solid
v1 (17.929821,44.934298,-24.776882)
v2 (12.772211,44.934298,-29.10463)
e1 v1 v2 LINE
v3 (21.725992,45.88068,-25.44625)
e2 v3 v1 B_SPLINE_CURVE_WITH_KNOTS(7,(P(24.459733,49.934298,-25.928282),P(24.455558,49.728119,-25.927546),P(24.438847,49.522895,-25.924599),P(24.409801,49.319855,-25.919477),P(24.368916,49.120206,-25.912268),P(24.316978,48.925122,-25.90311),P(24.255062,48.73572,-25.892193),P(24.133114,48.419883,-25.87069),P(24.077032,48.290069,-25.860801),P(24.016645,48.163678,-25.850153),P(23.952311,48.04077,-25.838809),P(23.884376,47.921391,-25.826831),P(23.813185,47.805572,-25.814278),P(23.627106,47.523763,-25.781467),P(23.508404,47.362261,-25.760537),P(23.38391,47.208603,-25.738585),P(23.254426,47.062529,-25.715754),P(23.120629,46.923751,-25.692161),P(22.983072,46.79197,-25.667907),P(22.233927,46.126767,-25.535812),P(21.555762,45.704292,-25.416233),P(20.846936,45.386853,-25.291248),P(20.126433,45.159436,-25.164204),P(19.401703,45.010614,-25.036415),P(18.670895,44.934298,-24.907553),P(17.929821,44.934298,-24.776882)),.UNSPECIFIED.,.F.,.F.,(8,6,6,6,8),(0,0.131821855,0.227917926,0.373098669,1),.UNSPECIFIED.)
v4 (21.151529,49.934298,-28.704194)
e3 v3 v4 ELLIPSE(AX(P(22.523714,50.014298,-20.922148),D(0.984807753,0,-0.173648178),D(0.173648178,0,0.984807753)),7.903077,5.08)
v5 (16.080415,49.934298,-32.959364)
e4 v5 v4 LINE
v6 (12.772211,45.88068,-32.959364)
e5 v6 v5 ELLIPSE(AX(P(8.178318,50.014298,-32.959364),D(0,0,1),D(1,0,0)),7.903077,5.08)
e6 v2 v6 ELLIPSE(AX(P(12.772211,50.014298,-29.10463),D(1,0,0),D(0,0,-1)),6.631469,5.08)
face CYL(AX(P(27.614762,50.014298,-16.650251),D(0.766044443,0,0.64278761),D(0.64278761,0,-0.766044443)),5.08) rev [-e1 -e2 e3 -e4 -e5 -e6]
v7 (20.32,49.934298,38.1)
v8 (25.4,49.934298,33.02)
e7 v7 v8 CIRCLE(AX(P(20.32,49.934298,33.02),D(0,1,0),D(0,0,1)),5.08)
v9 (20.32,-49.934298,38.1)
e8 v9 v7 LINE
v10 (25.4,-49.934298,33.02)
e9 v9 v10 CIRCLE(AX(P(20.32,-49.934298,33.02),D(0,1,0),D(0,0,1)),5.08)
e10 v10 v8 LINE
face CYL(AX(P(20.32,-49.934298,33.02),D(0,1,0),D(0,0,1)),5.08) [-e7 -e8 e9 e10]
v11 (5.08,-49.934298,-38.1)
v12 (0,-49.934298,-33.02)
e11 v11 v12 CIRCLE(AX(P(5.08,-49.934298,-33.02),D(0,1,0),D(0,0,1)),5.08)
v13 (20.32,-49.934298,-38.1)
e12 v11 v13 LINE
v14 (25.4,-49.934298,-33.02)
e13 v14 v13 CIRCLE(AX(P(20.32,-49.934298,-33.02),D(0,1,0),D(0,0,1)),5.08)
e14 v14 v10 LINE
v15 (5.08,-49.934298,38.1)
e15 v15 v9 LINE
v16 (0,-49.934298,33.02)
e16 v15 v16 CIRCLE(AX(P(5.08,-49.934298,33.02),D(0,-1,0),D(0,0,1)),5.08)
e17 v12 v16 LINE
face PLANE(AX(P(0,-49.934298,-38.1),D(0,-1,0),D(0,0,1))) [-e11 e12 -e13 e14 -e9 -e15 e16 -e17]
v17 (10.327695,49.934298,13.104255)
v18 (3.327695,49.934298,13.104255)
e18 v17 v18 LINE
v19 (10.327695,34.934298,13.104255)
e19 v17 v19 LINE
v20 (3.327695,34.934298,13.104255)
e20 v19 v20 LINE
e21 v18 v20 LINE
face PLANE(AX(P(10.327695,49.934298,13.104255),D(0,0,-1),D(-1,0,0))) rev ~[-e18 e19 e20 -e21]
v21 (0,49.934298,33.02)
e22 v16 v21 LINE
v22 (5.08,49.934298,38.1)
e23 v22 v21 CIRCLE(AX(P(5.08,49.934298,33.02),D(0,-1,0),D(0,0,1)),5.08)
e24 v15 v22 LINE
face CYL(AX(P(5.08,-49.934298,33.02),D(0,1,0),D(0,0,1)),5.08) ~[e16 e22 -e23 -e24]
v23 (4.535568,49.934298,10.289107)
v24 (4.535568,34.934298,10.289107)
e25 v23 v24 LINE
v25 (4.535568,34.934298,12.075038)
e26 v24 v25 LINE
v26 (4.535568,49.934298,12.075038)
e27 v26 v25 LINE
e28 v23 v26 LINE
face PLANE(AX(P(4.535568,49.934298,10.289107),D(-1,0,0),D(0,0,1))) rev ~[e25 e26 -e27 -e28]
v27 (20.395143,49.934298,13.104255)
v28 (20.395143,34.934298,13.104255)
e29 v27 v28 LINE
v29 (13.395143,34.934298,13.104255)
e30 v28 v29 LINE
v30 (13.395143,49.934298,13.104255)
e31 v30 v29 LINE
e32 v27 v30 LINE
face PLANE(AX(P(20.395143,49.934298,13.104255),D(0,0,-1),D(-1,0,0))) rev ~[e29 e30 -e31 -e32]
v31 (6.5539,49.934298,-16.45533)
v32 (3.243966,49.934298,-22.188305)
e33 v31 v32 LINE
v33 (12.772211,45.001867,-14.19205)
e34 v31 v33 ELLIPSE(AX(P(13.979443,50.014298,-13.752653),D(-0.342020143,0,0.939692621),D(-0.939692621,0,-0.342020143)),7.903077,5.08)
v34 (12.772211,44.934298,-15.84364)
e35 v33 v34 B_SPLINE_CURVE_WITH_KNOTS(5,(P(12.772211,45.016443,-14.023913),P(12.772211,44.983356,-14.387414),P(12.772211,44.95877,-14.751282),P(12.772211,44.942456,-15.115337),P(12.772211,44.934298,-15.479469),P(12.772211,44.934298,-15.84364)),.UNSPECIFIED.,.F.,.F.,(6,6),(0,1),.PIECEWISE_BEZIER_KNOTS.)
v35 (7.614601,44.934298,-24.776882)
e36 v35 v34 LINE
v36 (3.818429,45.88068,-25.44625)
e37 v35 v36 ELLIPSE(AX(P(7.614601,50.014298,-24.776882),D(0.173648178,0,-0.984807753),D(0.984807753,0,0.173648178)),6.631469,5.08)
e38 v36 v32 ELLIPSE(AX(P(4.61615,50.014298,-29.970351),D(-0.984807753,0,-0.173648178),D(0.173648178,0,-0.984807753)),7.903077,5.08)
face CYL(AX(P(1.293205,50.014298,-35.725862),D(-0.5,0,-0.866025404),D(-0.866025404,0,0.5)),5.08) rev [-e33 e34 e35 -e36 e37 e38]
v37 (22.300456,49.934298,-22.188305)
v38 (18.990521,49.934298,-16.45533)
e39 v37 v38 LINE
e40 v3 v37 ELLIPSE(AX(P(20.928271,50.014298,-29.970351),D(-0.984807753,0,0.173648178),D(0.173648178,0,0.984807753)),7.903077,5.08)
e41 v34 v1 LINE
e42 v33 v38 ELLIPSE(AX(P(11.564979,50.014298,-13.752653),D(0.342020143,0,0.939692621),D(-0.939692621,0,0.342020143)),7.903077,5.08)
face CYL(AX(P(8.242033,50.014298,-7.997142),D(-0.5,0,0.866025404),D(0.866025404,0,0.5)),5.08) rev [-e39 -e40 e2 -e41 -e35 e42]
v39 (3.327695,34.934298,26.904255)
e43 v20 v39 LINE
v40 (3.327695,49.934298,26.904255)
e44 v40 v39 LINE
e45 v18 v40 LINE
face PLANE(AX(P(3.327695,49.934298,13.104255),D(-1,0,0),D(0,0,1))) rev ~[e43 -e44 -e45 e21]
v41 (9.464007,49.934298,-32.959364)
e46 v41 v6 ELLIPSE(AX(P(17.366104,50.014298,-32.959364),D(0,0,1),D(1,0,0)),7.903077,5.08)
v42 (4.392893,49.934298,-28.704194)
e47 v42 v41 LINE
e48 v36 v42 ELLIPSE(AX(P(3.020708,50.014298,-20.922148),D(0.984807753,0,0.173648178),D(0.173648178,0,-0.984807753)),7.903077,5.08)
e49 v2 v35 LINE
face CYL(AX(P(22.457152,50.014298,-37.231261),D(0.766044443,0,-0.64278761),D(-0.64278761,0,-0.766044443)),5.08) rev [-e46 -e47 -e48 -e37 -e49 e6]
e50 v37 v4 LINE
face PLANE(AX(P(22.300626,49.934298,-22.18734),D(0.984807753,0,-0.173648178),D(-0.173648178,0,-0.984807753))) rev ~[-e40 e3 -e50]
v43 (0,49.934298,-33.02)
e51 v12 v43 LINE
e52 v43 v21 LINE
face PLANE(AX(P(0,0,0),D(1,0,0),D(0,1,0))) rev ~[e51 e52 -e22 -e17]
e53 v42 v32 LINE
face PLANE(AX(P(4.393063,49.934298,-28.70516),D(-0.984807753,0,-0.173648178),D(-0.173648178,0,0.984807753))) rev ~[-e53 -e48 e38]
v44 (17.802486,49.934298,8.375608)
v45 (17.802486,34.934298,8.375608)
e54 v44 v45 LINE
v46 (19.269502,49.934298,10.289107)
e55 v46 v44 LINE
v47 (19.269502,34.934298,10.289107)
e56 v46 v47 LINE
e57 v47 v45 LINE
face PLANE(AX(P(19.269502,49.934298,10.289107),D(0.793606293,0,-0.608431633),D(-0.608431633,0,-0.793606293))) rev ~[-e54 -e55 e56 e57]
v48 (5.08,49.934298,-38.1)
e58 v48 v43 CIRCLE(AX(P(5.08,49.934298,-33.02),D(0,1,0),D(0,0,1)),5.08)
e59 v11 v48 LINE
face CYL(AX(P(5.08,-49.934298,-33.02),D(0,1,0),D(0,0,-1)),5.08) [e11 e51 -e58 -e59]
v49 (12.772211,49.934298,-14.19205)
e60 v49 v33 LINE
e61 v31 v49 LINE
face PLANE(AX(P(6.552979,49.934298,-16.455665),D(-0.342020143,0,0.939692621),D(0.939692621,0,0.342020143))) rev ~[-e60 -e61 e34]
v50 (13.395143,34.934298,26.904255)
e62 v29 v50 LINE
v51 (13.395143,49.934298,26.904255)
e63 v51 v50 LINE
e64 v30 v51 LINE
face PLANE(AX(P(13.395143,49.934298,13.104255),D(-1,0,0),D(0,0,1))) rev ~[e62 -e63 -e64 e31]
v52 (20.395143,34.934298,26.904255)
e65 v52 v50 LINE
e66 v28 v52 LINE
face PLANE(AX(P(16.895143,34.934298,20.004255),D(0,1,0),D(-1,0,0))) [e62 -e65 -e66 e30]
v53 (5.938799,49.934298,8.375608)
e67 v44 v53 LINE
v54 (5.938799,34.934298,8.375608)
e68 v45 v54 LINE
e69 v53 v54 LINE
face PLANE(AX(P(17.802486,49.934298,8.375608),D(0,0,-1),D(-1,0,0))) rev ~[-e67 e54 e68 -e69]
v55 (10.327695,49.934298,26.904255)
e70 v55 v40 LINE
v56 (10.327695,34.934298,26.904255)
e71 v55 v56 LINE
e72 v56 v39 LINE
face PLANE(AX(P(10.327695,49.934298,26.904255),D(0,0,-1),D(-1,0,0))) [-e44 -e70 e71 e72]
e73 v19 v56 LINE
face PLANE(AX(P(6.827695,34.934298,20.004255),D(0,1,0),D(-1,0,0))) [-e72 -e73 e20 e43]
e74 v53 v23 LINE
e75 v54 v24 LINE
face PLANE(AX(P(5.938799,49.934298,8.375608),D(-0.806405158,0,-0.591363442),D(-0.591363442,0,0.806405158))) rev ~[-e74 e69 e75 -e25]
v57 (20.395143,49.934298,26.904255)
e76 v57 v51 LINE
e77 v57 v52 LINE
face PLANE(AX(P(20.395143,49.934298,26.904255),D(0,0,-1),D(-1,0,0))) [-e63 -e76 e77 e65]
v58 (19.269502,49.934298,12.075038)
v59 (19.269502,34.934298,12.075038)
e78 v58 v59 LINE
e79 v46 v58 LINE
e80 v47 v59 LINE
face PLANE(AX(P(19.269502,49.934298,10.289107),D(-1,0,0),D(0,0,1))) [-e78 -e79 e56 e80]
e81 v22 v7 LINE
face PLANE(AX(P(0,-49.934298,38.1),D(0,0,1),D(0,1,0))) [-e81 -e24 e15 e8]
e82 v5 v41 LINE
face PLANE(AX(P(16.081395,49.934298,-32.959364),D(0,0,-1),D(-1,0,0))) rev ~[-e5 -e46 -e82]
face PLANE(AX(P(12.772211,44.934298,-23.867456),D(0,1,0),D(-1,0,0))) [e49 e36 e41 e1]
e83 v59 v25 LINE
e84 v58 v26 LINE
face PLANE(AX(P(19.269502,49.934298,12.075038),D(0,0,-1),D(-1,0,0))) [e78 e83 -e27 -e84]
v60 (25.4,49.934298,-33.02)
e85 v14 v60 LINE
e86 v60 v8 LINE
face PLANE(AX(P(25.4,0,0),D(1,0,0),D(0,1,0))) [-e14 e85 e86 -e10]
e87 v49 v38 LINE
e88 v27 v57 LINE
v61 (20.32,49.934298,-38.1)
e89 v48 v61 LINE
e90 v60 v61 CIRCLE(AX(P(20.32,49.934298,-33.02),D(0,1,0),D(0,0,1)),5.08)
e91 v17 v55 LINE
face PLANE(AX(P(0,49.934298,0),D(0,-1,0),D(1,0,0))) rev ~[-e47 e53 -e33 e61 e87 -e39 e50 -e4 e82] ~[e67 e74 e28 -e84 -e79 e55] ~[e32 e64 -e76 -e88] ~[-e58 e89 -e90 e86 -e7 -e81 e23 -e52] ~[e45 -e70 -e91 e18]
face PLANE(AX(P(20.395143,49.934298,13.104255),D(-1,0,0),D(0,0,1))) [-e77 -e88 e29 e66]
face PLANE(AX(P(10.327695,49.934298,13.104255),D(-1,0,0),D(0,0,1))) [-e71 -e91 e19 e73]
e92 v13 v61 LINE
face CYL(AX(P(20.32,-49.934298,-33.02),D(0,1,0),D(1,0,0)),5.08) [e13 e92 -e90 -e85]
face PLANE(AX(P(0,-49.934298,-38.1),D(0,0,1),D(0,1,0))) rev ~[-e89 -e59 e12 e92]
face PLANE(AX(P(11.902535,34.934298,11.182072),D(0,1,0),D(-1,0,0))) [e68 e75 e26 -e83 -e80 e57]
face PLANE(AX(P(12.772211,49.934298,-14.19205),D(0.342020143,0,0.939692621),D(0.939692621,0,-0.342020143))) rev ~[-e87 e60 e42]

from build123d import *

# Parameters (mm, degrees)
F0_W          = 99.8685956001
F0_H          = 76.2
F1_DEPTH      = 25.4
F2_R          = 5.08
F3_R          = 5.08
F4_R          = 5.08
F5_R          = 5.08
F6_W          = 7
F6_H          = 13.8
F7_DEPTH      = 15
F8_W          = 14.7339338437
F8_H          = 1.7859311774
F9_DEPTH      = 15
F11_DEPTH     = 5
F12_T4_DEPTH  = 32.018367851
F12_T10_DEPTH = 32.018367851
F12_T17_DEPTH = 32.018367851
F12_T23_DEPTH = 32.018367851


# Not quite as in the source:
# - a fillet or chamfer that OpenCascade refuses, or shapes differently, is made with other operations: its cross-section is extruded or revolved along the edge and cut away or added


with BuildPart() as f1:
    # F0 (on Right) → F1 (new body)
    with BuildSketch(Plane.YZ):
        Rectangle(F0_W, F0_H)
    extrude(amount=F1_DEPTH)

    # F2
    f2_edges = [f1.edges().sort_by_distance(p)[0] for p in [
        (25.4, 0, 38.1),
    ]]
    fillet(f2_edges, radius=F2_R)

    # F3
    f3_edges = [f1.edges().sort_by_distance(p)[0] for p in [
        (0, 0, 38.1),
    ]]
    fillet(f3_edges, radius=F3_R)

    # F4
    f4_edges = [f1.edges().sort_by_distance(p)[0] for p in [
        (25.4, 0, -38.1),
    ]]
    fillet(f4_edges, radius=F4_R)

    # F5
    f5_edges = [f1.edges().sort_by_distance(p)[0] for p in [
        (0, 0, -38.1),
    ]]
    fillet(f5_edges, radius=F5_R)

    # F6 (on face) → F7 (cut)
    with BuildSketch(Plane(origin=(0, 49.9342978001, 0), x_dir=(-1, 0, 0), z_dir=(0, 1, 0))):
        with Locations((-6.8276954116, 20.0042553112)):
            Rectangle(F6_W, F6_H)
        with Locations((-16.8951429576, 20.0042553112)):
            Rectangle(F6_W, F6_H)
    extrude(amount=-F7_DEPTH, mode=Mode.SUBTRACT)

    # F8 (on face) → F9 (cut)
    with BuildSketch(Plane(origin=(0, 49.9342978001, 0), x_dir=(-1, 0, 0), z_dir=(0, 1, 0))):
        with Locations((-11.9025348686, 11.1820721067)):
            Rectangle(F8_W, F8_H)
        Polygon((-4.5355679467, 10.289106518), (-19.2695017904, 10.289106518), (-17.8024861962, 8.3756083623), (-5.9387991205, 8.3756083623), align=None)
    extrude(amount=-F9_DEPTH, mode=Mode.SUBTRACT)

    # F10 (on face) → F11 (cut)
    with BuildSketch(Plane(origin=(0, 49.9342978001, 0), x_dir=(-1, 0, 0), z_dir=(0, 1, 0))):
        Polygon((-16.0813947992, -32.9593643546), (-9.4630269482, -32.9593643546), (-4.3930630334, -28.7051595036), (-3.2437955169, -22.1873395316), (-6.5529794424, -16.4556648411), (-12.7722108737, -14.1920497201), (-18.9914423049, -16.4556648411), (-22.3006262304, -22.1873395316), (-21.151358714, -28.7051595036), align=None)
    extrude(amount=-F11_DEPTH, mode=Mode.SUBTRACT)

    # F12: fillet of radius 5.08 on 4 edges, made by hand


with BuildPart() as f12_tool2:
    # F12_s3 → F12_t4 (new body)
    with BuildSketch(Plane(origin=(5.5233724705, 0, -9.566761748), x_dir=(0, 1, 0), z_dir=(0.5, 0, -0.8660254038))):
        with BuildLine():
            ThreePointArc((50.0142978001, 8.21923907), (46.4221953516, 6.7313415185), (44.9342978001, 3.13923907))
            Line((44.9342978001, 3.13923907), (44.9342978001, 8.21923907))
            Line((44.9342978001, 8.21923907), (50.0142978001, 8.21923907))
        make_face()
    extrude(amount=F12_T4_DEPTH)

    split(bisect_by=Plane.XZ.offset(-49.9342978001), keep=Keep.TOP)

    split(bisect_by=Plane(origin=(25.4224385924, 0, -4.4826618392), x_dir=(0, 1, 0), z_dir=(-0.984807753, 0, 0.1736481777)), keep=Keep.TOP)


with BuildPart() as f1_1:
    add(f1.part)

    # F12_t1: union F12_tool2
    add(f12_tool2.part)


with BuildPart() as f12_tool8:
    # F12_s9 → F12_t10 (new body)
    with BuildSketch(Plane(origin=(31.5112153695, 0, -26.4410491945), x_dir=(0, 1, 0), z_dir=(-0.7660444431, 0, 0.6427876097))):
        with BuildLine():
            ThreePointArc((50.0142978001, 19.1656214402), (46.4221953516, 17.6777238886), (44.9342978001, 14.0856214402))
            Line((44.9342978001, 14.0856214402), (44.9342978001, 19.1656214402))
            Line((44.9342978001, 19.1656214402), (50.0142978001, 19.1656214402))
        make_face()
    extrude(amount=F12_T10_DEPTH)

    split(bisect_by=Plane.XZ.offset(-49.9342978001), keep=Keep.TOP)

    split(bisect_by=Plane(origin=(-0.6482754096, 0, -0.1143084456), x_dir=(0, 1, 0), z_dir=(0.984807753, 0, 0.1736481777)), keep=Keep.TOP)

    split(bisect_by=Plane.XY.offset(-32.9593643546), keep=Keep.TOP)


with BuildPart() as f1_2:
    add(f1_1.part)

    # F12_t7: union F12_tool8
    add(f12_tool8.part)


with BuildPart() as f12_tool15:
    # F12_s16 → F12_t17 (new body)
    with BuildSketch(Plane(origin=(-15.1464509592, 0, -26.2344226156), x_dir=(0, 1, 0), z_dir=(0.5, 0, 0.8660254038))):
        with BuildLine():
            ThreePointArc((50.0142978001, -13.9028790881), (46.4221953516, -15.3907766397), (44.9342978001, -18.9828790881))
            Line((44.9342978001, -18.9828790881), (44.9342978001, -13.9028790881))
            Line((44.9342978001, -13.9028790881), (50.0142978001, -13.9028790881))
        make_face()
    extrude(amount=F12_T17_DEPTH)

    split(bisect_by=Plane.XZ.offset(-49.9342978001), keep=Keep.TOP)

    split(bisect_by=Plane(origin=(-12.3194239937, 0, -14.6817178032), x_dir=(0, 1, 0), z_dir=(0.6427876097, 0, 0.7660444431)), keep=Keep.TOP)


with BuildPart() as f1_3:
    add(f1_2.part)

    # F12_t14: union F12_tool15
    add(f12_tool15.part)


with BuildPart() as f12_tool21:
    # F12_s22 → F12_t23 (new body)
    with BuildSketch(Plane(origin=(8.0063594172, 0, 6.7181332341), x_dir=(0, 1, 0), z_dir=(-0.7660444431, 0, -0.6427876097))):
        with BuildLine():
            ThreePointArc((50.0142978001, 35.585259236), (46.4221953516, 34.0973616844), (44.9342978001, 30.505259236))
            Line((44.9342978001, 30.505259236), (44.9342978001, 35.585259236))
            Line((44.9342978001, 35.585259236), (50.0142978001, 35.585259236))
        make_face()
    extrude(amount=F12_T23_DEPTH)

    split(bisect_by=Plane.XZ.offset(-49.9342978001), keep=Keep.TOP)

    split(bisect_by=Plane(origin=(7.1180698344, 0, 4.109619535), x_dir=(0, 1, 0), z_dir=(-0.8660254038, 0, -0.5)), keep=Keep.TOP)

    split(bisect_by=Plane.XY.offset(-32.9593643546), keep=Keep.TOP)


with BuildPart() as f1_4:
    add(f1_3.part)

    # F12_t20: union F12_tool21
    add(f12_tool21.part)


solid = f1_4.part
